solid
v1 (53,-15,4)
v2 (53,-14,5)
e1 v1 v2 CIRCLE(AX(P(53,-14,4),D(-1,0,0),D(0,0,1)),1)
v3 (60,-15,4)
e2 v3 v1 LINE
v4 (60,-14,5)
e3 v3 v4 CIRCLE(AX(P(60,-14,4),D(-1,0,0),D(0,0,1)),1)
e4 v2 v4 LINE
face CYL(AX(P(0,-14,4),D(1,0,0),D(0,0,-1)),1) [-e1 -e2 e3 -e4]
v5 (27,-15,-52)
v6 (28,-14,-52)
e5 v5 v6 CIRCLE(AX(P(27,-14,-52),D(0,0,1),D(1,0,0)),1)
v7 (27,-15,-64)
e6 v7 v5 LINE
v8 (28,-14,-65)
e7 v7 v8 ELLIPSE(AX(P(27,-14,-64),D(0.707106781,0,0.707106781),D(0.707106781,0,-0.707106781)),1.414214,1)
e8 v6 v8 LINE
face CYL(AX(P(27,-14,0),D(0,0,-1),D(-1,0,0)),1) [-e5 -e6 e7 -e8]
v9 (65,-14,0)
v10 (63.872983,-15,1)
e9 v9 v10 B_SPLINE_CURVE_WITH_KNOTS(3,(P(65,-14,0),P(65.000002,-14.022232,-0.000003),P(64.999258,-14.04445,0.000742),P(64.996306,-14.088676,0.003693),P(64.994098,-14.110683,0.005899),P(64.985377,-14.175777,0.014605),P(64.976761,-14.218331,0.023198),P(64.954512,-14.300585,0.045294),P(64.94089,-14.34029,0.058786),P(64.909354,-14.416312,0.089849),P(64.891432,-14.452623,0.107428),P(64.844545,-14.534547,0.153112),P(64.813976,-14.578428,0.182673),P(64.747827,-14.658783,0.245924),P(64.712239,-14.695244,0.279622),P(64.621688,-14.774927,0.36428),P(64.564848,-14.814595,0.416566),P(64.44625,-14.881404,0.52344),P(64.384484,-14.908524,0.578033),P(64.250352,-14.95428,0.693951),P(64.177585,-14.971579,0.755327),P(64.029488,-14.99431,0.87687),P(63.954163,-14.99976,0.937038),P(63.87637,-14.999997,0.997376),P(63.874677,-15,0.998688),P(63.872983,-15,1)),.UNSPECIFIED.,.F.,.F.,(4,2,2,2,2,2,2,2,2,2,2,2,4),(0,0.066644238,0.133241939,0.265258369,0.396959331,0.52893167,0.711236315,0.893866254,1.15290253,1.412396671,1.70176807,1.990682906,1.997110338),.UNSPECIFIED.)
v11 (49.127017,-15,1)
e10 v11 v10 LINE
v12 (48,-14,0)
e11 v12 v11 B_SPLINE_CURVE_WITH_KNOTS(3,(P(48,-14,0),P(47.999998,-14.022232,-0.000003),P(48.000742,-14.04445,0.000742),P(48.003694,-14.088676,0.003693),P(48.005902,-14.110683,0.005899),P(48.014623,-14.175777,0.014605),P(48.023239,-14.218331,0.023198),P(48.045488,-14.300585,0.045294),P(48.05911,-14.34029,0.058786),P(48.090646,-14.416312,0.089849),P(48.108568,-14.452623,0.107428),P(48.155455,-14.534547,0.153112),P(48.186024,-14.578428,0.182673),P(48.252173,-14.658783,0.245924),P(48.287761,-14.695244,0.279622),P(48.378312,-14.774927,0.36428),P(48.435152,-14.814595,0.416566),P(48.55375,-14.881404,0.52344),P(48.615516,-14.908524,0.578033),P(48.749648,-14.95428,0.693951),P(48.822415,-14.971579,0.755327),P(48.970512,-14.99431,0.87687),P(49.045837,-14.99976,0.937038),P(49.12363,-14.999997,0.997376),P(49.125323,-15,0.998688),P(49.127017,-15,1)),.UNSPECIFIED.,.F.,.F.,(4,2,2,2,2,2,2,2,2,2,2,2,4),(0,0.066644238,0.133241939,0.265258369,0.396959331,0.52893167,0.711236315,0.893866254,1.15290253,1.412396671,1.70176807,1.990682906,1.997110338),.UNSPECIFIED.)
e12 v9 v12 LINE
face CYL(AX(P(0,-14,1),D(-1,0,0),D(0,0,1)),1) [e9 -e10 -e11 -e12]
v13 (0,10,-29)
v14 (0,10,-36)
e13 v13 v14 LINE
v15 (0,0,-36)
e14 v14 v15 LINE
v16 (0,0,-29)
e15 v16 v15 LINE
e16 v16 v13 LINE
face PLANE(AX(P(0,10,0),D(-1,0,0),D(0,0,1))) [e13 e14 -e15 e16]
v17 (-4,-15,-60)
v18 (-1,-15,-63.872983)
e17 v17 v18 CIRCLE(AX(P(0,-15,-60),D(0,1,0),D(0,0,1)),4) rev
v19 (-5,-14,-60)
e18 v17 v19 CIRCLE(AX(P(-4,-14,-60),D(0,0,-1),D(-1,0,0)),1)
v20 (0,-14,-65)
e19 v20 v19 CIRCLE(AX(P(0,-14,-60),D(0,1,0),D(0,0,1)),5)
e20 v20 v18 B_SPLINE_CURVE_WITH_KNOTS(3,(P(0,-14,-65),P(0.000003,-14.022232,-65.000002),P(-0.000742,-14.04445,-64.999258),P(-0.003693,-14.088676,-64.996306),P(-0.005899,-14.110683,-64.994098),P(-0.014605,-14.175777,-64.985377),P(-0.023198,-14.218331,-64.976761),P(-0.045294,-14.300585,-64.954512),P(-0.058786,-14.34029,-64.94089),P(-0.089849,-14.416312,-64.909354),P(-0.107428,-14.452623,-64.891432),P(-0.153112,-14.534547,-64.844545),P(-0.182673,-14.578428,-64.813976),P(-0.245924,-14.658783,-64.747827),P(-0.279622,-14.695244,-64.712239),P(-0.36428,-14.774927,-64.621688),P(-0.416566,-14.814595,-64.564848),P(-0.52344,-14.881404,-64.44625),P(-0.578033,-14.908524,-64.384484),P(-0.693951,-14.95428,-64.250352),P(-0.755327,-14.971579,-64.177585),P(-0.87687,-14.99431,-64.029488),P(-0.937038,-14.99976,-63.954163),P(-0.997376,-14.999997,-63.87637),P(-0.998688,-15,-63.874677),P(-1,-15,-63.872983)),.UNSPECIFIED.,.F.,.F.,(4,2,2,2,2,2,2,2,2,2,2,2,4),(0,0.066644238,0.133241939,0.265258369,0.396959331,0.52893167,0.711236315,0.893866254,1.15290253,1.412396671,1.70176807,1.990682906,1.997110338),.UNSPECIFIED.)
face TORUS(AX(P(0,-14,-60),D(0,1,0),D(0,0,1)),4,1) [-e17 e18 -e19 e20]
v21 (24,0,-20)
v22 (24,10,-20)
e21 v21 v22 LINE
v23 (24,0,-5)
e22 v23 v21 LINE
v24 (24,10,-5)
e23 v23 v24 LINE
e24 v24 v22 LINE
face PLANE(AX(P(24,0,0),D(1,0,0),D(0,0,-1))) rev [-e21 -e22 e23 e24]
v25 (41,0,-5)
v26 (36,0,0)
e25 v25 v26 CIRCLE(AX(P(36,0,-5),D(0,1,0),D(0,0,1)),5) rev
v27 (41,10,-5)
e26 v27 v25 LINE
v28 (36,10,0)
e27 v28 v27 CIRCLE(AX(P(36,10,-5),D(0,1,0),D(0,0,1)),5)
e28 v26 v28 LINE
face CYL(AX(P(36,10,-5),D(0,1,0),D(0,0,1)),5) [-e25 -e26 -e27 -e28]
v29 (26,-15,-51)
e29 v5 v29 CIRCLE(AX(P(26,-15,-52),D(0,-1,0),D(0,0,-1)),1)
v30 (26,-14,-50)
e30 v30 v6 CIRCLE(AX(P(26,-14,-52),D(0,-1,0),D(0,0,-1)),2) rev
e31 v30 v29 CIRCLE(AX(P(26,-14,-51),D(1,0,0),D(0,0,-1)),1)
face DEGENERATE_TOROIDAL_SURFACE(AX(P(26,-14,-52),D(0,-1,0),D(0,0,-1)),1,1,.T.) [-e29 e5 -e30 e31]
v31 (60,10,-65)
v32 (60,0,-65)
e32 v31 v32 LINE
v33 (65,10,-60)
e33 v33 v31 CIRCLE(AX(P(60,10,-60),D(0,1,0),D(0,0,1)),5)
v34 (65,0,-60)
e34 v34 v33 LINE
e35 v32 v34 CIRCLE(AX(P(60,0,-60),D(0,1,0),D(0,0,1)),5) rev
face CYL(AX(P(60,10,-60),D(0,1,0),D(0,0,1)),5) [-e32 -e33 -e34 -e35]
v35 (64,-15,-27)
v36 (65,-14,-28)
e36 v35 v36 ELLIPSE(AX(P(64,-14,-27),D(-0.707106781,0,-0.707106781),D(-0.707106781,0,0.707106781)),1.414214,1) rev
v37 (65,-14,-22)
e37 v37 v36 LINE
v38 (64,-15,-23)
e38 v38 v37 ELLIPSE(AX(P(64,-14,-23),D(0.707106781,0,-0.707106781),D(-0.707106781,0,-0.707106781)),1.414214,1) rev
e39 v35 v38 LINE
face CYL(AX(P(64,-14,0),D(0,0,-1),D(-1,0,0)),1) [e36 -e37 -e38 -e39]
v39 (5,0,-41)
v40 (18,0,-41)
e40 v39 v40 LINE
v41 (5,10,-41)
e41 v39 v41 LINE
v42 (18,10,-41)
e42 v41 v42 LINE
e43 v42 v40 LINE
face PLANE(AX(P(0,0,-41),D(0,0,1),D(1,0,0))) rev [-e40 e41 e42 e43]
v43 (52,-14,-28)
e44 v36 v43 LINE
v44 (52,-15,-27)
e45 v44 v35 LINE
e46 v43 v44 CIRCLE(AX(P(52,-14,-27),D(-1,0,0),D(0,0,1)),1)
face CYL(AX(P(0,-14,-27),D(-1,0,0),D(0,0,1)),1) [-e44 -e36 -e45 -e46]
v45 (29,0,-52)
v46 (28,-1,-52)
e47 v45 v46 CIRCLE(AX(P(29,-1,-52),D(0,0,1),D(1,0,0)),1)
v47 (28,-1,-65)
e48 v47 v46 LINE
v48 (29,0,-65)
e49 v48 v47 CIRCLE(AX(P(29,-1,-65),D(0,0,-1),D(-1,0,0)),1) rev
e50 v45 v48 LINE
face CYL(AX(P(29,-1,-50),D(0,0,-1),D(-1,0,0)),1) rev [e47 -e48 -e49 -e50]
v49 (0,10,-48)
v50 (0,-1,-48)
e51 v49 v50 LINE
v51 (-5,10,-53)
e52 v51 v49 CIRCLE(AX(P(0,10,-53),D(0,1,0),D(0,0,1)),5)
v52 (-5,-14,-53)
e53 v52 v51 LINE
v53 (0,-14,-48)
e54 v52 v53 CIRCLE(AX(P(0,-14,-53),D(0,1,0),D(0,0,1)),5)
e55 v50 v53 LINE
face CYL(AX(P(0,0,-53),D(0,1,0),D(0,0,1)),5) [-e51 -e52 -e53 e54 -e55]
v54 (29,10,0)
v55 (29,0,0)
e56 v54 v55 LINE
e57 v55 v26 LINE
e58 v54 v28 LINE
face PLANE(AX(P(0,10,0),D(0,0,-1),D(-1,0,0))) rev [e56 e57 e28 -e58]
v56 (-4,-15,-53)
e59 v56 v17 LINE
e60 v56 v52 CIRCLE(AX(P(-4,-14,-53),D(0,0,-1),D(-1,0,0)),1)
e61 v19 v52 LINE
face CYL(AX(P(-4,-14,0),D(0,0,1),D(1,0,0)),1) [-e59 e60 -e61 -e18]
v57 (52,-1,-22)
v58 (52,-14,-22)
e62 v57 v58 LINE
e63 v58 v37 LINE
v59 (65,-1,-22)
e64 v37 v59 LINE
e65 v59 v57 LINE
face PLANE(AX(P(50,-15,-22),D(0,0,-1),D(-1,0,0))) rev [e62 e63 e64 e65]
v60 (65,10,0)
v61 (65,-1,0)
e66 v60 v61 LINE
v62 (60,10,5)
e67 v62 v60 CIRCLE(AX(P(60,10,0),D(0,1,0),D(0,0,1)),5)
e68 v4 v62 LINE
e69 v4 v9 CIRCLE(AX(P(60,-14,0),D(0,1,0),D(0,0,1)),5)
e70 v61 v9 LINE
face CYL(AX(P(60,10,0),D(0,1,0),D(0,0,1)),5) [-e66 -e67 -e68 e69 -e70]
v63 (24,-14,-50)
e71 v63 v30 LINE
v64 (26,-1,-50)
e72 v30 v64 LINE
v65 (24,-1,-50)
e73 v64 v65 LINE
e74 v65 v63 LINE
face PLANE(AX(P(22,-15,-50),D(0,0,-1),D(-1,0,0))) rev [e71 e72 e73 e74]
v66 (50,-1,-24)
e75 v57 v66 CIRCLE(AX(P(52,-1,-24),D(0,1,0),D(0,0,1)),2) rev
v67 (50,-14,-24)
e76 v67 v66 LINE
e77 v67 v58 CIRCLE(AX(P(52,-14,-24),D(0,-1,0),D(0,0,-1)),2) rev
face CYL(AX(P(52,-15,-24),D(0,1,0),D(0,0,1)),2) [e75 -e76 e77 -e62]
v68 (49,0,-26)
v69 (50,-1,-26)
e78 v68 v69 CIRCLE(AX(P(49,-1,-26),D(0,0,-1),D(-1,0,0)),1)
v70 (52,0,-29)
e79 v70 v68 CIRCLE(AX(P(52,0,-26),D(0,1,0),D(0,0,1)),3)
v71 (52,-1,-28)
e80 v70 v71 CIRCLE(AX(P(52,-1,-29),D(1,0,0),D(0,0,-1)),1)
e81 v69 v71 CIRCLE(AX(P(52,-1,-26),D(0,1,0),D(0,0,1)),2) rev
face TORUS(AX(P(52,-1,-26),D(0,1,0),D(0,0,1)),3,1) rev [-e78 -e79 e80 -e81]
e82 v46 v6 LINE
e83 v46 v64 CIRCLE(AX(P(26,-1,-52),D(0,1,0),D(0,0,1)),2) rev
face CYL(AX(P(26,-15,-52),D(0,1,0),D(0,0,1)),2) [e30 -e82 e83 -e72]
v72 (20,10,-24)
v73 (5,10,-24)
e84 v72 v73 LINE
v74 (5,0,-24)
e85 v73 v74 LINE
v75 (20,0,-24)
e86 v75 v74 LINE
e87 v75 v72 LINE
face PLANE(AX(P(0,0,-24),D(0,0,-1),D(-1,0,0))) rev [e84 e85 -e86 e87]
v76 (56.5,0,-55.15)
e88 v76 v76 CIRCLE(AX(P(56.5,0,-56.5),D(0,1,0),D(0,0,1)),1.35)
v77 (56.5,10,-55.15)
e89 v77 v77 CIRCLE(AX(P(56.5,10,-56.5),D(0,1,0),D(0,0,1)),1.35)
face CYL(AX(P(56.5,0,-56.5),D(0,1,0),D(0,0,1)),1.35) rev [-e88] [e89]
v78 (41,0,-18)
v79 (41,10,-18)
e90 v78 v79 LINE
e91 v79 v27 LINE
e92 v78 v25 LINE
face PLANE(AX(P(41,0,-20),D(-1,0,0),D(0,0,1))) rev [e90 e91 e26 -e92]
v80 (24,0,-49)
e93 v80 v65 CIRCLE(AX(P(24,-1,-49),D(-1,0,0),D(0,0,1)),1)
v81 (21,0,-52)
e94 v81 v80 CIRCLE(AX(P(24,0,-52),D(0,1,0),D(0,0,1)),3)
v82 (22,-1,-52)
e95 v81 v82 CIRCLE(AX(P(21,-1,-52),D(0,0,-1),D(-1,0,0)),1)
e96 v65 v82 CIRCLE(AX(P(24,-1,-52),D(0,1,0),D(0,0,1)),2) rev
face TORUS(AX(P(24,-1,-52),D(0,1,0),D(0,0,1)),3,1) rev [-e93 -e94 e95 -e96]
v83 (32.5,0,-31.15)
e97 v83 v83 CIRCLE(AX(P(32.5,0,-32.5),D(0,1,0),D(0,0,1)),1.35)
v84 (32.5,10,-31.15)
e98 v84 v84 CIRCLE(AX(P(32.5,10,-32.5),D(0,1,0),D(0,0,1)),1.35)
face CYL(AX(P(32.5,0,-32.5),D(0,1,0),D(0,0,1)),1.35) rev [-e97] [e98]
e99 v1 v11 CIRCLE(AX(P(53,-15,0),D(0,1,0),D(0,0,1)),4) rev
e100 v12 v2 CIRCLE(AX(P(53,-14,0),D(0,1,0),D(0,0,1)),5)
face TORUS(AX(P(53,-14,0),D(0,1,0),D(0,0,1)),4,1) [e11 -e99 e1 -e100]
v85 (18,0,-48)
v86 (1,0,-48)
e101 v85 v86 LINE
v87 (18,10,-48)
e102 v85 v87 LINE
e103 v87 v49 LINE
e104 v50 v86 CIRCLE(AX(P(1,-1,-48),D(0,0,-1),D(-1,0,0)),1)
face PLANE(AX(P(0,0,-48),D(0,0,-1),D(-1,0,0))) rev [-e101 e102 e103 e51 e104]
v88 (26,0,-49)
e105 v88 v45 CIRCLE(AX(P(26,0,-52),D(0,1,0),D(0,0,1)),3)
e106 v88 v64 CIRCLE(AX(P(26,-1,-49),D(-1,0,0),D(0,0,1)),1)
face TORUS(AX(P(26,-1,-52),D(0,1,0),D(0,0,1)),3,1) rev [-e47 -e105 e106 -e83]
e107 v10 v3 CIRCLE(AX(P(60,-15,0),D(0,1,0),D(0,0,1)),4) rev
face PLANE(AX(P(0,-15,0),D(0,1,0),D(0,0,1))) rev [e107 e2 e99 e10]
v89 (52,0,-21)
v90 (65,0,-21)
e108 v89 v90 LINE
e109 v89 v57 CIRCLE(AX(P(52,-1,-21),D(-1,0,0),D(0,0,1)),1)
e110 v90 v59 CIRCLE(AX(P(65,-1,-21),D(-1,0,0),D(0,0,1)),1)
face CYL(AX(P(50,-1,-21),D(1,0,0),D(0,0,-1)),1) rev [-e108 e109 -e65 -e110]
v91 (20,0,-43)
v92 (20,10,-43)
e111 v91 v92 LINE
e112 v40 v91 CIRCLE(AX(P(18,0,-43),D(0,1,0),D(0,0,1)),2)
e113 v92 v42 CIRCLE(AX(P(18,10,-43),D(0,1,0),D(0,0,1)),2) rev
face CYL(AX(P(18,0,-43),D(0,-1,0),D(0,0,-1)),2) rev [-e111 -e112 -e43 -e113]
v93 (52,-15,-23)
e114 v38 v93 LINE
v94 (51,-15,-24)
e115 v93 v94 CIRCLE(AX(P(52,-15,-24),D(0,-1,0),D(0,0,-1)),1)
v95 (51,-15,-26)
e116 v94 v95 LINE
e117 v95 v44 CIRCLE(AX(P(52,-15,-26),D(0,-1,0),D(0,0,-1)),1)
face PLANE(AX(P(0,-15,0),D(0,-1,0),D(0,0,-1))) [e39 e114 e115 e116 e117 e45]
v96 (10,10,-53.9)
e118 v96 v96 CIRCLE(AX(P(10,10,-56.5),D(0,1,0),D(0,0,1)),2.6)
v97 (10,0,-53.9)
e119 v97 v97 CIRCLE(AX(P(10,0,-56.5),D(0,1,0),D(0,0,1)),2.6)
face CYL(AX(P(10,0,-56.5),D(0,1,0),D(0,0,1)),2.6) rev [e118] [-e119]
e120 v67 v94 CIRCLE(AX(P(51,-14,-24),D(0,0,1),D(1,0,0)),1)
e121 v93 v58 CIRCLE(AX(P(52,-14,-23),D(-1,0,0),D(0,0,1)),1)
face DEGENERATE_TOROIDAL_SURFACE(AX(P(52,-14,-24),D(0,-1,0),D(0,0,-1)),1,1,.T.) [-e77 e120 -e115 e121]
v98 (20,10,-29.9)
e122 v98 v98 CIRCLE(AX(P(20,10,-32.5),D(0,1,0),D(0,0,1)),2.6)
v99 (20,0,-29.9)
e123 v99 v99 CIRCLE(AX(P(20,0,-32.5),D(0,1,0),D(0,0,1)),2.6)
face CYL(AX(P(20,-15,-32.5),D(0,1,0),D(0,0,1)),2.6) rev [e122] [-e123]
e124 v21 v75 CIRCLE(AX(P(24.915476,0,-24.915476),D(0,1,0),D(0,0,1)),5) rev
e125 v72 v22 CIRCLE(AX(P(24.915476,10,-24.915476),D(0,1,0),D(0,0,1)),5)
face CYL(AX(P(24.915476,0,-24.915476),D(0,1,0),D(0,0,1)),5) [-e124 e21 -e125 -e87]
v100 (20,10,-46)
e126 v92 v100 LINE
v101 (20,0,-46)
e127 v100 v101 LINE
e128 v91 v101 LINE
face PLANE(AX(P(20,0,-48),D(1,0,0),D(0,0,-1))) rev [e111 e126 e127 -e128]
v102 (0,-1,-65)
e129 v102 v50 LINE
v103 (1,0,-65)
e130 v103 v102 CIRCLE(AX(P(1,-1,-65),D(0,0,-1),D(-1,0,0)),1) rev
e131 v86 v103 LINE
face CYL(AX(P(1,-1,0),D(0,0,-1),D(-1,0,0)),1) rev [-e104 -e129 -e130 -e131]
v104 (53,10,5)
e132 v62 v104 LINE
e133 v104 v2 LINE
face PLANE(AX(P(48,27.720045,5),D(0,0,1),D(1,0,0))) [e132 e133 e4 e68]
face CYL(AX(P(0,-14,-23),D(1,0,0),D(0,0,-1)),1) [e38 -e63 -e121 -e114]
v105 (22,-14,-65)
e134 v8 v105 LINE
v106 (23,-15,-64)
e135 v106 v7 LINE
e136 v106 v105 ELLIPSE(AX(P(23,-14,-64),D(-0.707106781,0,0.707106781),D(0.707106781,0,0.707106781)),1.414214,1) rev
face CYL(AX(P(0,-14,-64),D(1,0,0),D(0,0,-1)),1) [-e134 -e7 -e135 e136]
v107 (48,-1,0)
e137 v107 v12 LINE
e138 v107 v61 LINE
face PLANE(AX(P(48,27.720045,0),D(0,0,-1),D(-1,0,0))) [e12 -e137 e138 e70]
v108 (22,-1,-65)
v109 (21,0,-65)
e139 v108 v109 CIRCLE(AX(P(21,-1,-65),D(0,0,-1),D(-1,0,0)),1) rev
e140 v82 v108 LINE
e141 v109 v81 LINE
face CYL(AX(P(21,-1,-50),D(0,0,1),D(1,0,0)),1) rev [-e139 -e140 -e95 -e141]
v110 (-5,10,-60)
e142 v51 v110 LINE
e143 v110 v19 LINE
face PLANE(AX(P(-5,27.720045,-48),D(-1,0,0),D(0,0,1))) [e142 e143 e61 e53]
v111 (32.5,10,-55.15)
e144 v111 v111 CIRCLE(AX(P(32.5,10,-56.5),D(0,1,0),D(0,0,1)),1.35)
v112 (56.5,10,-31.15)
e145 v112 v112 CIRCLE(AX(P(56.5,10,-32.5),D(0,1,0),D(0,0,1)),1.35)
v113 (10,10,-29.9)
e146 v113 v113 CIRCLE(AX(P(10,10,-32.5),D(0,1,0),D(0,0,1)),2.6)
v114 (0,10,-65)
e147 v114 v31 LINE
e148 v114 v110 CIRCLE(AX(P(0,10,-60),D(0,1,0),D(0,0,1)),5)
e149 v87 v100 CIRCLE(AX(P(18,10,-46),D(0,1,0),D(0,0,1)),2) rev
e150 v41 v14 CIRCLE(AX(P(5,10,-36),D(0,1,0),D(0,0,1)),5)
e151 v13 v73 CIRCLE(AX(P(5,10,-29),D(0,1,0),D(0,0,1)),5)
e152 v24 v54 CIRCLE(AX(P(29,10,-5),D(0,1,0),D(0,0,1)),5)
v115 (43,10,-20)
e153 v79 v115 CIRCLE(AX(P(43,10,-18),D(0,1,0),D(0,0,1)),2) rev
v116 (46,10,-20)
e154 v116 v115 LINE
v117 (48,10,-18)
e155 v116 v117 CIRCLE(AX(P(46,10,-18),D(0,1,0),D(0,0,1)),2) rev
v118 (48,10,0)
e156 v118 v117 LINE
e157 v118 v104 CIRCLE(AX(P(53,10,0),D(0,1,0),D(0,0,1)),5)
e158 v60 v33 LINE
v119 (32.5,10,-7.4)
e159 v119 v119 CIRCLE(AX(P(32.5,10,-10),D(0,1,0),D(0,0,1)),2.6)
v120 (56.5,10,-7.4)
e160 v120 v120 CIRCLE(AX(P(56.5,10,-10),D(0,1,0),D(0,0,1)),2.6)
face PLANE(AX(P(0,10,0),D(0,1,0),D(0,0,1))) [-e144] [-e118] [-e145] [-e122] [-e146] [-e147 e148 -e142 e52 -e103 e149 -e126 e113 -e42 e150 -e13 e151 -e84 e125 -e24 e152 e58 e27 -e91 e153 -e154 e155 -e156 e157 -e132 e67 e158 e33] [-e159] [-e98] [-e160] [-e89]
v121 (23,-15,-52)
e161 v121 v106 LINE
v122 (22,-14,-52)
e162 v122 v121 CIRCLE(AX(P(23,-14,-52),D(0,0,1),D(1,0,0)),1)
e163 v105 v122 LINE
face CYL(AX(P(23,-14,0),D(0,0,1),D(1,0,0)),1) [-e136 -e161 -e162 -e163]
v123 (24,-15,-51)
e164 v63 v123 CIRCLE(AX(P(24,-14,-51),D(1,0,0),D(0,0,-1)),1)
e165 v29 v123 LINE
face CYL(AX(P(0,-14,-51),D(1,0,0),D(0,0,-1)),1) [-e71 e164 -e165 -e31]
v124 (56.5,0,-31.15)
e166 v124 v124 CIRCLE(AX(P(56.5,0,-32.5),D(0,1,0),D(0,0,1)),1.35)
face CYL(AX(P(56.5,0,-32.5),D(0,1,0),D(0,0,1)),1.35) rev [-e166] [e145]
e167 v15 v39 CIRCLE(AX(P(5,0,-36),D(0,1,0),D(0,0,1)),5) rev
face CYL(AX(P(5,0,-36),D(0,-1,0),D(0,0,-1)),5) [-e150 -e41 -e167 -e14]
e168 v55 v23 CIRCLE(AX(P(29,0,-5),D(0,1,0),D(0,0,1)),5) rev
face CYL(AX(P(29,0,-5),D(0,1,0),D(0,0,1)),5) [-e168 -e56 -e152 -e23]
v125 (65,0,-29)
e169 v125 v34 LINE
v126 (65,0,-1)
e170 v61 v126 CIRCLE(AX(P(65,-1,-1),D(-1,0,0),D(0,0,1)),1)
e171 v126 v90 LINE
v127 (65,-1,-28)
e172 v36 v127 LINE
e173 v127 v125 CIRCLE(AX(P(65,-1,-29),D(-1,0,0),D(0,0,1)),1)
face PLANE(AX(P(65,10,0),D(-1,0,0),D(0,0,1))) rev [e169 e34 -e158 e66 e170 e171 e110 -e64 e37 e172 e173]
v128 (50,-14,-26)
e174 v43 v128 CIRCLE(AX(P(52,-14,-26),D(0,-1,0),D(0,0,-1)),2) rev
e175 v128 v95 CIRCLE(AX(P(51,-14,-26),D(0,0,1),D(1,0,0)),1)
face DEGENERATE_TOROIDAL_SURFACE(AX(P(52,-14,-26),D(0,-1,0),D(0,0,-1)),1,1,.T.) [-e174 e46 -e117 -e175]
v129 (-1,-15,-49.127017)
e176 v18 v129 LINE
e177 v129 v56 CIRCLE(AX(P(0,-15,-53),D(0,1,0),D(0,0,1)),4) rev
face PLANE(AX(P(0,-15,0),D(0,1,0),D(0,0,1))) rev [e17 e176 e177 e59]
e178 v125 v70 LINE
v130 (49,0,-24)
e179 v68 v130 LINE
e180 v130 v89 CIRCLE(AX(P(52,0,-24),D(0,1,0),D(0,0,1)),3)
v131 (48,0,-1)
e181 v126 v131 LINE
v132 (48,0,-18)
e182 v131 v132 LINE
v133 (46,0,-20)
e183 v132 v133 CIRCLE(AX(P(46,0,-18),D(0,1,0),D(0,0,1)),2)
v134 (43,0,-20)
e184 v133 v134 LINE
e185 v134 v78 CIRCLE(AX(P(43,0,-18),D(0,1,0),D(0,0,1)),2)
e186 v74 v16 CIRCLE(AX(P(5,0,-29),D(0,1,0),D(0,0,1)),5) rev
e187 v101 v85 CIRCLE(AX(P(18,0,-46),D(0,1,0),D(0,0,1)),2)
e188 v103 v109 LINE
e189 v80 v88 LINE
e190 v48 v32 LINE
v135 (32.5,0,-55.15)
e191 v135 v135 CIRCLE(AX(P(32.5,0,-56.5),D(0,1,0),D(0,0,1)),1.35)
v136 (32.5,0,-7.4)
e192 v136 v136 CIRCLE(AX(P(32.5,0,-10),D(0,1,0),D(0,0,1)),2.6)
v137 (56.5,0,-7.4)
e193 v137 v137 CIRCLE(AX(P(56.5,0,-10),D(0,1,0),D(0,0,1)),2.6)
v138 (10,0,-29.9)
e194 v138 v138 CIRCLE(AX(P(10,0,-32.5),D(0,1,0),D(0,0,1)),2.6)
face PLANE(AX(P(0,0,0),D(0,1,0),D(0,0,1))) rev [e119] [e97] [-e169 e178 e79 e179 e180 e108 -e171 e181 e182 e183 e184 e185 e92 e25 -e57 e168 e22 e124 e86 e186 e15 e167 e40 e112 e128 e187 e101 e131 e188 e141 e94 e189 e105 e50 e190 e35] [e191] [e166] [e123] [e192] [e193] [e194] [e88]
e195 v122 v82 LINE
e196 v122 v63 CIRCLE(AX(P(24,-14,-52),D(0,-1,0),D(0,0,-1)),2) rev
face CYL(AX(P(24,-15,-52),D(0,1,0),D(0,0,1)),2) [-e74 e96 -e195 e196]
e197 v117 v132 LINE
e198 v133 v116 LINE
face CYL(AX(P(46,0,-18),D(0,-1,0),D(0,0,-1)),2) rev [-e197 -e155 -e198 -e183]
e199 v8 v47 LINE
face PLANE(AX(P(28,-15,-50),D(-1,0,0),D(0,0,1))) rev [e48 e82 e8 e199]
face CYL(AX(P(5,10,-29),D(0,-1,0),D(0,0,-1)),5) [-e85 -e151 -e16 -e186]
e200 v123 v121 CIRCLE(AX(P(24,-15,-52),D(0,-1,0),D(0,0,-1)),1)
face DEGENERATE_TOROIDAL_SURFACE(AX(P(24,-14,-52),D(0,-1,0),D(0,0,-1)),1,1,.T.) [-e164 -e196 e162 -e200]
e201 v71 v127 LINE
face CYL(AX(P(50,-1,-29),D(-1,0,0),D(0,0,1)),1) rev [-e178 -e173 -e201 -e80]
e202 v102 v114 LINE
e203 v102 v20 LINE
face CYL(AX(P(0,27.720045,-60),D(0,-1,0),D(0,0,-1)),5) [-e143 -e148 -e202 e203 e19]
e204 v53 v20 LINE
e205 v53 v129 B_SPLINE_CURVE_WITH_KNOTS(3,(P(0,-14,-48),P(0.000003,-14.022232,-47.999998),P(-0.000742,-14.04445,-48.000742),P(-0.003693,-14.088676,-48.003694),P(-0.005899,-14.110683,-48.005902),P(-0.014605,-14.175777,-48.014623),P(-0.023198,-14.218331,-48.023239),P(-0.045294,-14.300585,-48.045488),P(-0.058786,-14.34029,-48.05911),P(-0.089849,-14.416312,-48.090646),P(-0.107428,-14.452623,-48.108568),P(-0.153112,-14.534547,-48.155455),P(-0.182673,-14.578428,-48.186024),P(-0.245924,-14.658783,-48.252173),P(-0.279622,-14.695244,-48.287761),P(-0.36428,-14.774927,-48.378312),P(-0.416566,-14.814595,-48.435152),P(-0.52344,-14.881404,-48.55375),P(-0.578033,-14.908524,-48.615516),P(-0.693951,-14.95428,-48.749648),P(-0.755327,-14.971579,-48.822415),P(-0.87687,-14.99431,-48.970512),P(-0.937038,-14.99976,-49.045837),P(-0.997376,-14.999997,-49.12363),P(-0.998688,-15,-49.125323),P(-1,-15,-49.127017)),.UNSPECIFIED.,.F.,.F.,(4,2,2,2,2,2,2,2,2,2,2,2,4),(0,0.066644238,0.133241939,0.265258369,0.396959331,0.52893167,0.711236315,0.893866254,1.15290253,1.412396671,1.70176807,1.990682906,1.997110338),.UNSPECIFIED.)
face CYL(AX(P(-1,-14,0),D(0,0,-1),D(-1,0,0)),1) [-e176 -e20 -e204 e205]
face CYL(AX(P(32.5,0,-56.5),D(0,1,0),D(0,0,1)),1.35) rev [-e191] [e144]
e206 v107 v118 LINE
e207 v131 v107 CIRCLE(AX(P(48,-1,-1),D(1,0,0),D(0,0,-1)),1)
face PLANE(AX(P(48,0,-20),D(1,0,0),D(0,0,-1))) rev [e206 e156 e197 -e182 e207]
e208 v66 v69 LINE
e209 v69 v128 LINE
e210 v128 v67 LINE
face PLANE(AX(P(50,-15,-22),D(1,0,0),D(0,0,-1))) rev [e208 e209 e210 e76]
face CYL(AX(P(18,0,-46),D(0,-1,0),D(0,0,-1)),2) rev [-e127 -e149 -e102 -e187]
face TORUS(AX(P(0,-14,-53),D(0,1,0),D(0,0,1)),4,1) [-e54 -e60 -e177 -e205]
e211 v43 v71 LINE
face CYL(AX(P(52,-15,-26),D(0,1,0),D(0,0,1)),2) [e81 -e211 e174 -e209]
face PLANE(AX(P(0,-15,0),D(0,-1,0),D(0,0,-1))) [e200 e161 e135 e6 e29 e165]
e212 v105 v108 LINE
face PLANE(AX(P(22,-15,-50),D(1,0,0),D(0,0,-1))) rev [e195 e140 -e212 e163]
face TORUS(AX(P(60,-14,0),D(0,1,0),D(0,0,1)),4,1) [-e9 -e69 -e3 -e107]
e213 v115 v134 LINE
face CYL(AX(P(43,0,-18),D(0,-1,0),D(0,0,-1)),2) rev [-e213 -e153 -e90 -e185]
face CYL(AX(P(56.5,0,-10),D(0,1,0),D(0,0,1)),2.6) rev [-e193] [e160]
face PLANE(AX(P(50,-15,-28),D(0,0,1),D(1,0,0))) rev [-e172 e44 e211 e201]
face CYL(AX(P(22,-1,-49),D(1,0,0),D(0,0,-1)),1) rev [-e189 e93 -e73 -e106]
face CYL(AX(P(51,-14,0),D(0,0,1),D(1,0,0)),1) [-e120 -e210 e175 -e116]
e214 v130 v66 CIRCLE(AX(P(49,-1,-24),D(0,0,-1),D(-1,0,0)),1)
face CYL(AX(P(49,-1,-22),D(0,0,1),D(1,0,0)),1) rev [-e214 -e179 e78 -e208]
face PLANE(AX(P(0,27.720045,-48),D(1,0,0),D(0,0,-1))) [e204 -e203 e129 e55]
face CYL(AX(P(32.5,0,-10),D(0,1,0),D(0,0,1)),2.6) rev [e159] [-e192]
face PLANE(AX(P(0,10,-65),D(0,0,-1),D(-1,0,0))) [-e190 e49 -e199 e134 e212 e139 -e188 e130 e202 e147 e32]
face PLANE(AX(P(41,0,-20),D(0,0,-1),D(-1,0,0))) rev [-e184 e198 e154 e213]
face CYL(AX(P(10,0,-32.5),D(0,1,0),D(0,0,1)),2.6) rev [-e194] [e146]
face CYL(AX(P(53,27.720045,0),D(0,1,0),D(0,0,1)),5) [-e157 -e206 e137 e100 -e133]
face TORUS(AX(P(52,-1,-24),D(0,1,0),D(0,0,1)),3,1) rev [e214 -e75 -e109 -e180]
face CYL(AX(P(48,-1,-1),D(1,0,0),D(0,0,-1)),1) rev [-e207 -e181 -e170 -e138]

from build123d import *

# Parameters (mm, degrees)
SKETCH1_W                = 65
SKETCH1_H                = 65
BOSS_EXTRUDE2_DEPTH      = 10
SKETCH6_R                = 1.35
CUT_EXTRUDE3_DEPTH       = 93.466210045
SKETCH7_R                = 2.6
SKETCH7_W                = 20
SKETCH7_H                = 7
SKETCH7_W_2              = 7
SKETCH7_H_2              = 20
CUT_EXTRUDE4_DEPTH       = 93.466210045
SKETCH9_W                = 15
SKETCH9_H                = 6
SKETCH9_W_2              = 6
SKETCH9_H_2              = 15
BOSS_EXTRUDE5_DEPTH      = 15
FILLET4_R                = 2
FILLET5_R                = 1
FILLET6_R                = 1
BOSS_EXTRUDE6_DEPTH      = 15
BOSS_EXTRUDE6_DEPTH_BACK = 10
SKETCH10_W               = 17
SKETCH10_H               = 5
SKETCH10_W_2             = 5
SKETCH10_H_2             = 17
FILLET7_R                = 5
FILLET8_R                = 1
SKETCH11_R               = 2.6
CUT_EXTRUDE5_DEPTH       = 96.262794579


with BuildPart() as part:
    # Sketch1 → Boss-Extrude2 (new body)
    with BuildSketch(Plane(origin=(0, 0, 0), x_dir=(1, 0, 0), z_dir=(0, 1, 0))):
        with Locations((32.5, 32.5)):
            Rectangle(SKETCH1_W, SKETCH1_H)
    extrude(amount=BOSS_EXTRUDE2_DEPTH)

    # Sketch6 → Cut-Extrude3 (cut, through all)
    with BuildSketch(Plane(origin=(0, 10, 0), x_dir=(1, 0, 0), z_dir=(0, 1, 0))):
        with Locations(Location((56.5, 56.5, 0), (0, 0, 270))):
            Circle(SKETCH6_R)
        with Locations(Location((32.5, 56.5, 0), (0, 0, 270))):
            Circle(SKETCH6_R)
        with Locations(Location((32.5, 32.5, 0), (0, 0, 270))):
            Circle(SKETCH6_R)
        with Locations(Location((56.5, 32.5, 0), (0, 0, 270))):
            Circle(SKETCH6_R)
    extrude(amount=-CUT_EXTRUDE3_DEPTH, mode=Mode.SUBTRACT)

    # Sketch7 → Cut-Extrude4 (cut, through all)
    with BuildSketch(Plane(origin=(0, 10, 0), x_dir=(1, 0, 0), z_dir=(0, 1, 0))):
        with Locations(Location((10, 32.5, 0), (0, 0, 270))):
            Circle(SKETCH7_R)
        with Locations(Location((10, 56.5, 0), (0, 0, 270))):
            Circle(SKETCH7_R)
        with Locations(Location((32.5, 10, 0), (0, 0, 270))):
            Circle(SKETCH7_R)
        with Locations(Location((56.5, 10, 0), (0, 0, 270))):
            Circle(SKETCH7_R)
        with Locations((10, 44.5)):
            Rectangle(SKETCH7_W, SKETCH7_H)
        with Locations((44.5, 10)):
            Rectangle(SKETCH7_W_2, SKETCH7_H_2)
        Polygon((0, 24), (20, 24), (20, 20), (24, 20), (24, 0), (20, 0), (0, 0), (0, 20), align=None)
    extrude(amount=-CUT_EXTRUDE4_DEPTH, mode=Mode.SUBTRACT)

    # Sketch9 → Boss-Extrude5 (add)
    with BuildSketch(Plane.XZ):
        with Locations((57.5, -25)):
            Rectangle(SKETCH9_W, SKETCH9_H)
        with Locations((25, -57.5)):
            Rectangle(SKETCH9_W_2, SKETCH9_H_2)
    extrude(amount=BOSS_EXTRUDE5_DEPTH)

    # Fillet4
    fillet4_edges = [part.edges().sort_by_distance(p)[0] for p in [
        (50, -7.5, -22),
        (50, -7.5, -28),
        (22, -7.5, -50),
        (28, -7.5, -50),
        (41, 5, -20),
        (48, 5, -20),
        (20, 5, -48),
        (20, 5, -41),
    ]]
    fillet(fillet4_edges, radius=FILLET4_R)

    # Fillet5
    fillet5_edges = [part.edges().sort_by_distance(p)[0] for p in [
        (58.5, 0, -22),
        (28, 0, -58.5),
        (22, 0, -58.5),
        (25, 0, -50),
        (58.5, 0, -28),
        (50, 0, -25),
        (22.585786438, 0, -50.585786438),
        (27.414213562, 0, -50.585786438),
        (50.585786438, 0, -27.414213562),
        (50.585786438, 0, -22.585786438),
    ]]
    fillet(fillet5_edges, radius=FILLET5_R)

    # Fillet6
    fillet6_edges = [part.edges().sort_by_distance(p)[0] for p in [
        (65, -15, -25),
        (58.5, -15, -22),
        (25, -15, -65),
        (28, -15, -58.5),
        (22, -15, -58.5),
        (25, -15, -50),
        (27.414213562, -15, -50.585786438),
        (22.585786438, -15, -50.585786438),
        (58.5, -15, -28),
        (50, -15, -25),
        (50.585786438, -15, -22.585786438),
        (50.585786438, -15, -27.414213562),
    ]]
    fillet(fillet6_edges, radius=FILLET6_R)

    # Sketch10 → Boss-Extrude6 (add, two sides: drawn at the far end of the back side and taken through both)
    with BuildSketch(Plane.XZ.offset(-BOSS_EXTRUDE6_DEPTH_BACK)):
        with Locations((56.5, 2.5)):
            Rectangle(SKETCH10_W, SKETCH10_H)
        with Locations((-2.5, -56.5)):
            Rectangle(SKETCH10_W_2, SKETCH10_H_2)
    extrude(amount=BOSS_EXTRUDE6_DEPTH + BOSS_EXTRUDE6_DEPTH_BACK)

    # Fillet7
    # the kernel refuses this fillet: 5 mm, written as the material it takes off along each edge
    with BuildSketch(Plane(origin=(65, -12.5, -65), x_dir=(-1, 0, 0), z_dir=(0, 1, 0)), Plane(origin=(41, 22.5, 0), x_dir=(-1, 0, 0), z_dir=(0, -1, 0)), Plane(origin=(24, 22.5, 0), x_dir=(0, 0, -1), z_dir=(0, -1, 0)), Plane(origin=(0, 22.5, -24), x_dir=(0, 0, -1), z_dir=(0, -1, 0)), Plane(origin=(0, 22.5, -41), x_dir=(1, 0, 0), z_dir=(0, -1, 0))) as fillet7_piece_1:
        with BuildLine():
            CenterArc((FILLET7_R, FILLET7_R), FILLET7_R, 180, 90)
            Line((0, FILLET7_R), (0, 0))
            Line((0, 0), (FILLET7_R, 0))
        make_face()
    extrude(amount=35, mode=Mode.SUBTRACT)
    with BuildSketch(Plane(origin=(65, 22.5, 5), x_dir=(-1, 0, 0), z_dir=(0, -1, 0)), Plane(origin=(-5, 22.5, -65), x_dir=(1, 0, 0), z_dir=(0, -1, 0))) as fillet7_piece_2:
        with BuildLine():
            CenterArc((FILLET7_R, FILLET7_R), FILLET7_R, 180, 90)
            Line((0, FILLET7_R), (0, 0))
            Line((0, 0), (FILLET7_R, 0))
        make_face()
    extrude(amount=50, mode=Mode.SUBTRACT)
    with BuildSketch(Plane(origin=(48, -27.5, 5), x_dir=(0, 0, -1), z_dir=(0, 1, 0)), Plane(origin=(-5, 22.5, -48), x_dir=(1, 0, 0), z_dir=(0, -1, 0))) as fillet7_piece_3:
        with BuildLine():
            CenterArc((FILLET7_R, -FILLET7_R), FILLET7_R, 90, 90)
            Line((0, -FILLET7_R), (0, 0))
            Line((0, 0), (FILLET7_R, 0))
        make_face()
    extrude(amount=50, mode=Mode.SUBTRACT)
    with BuildSketch(Plane(origin=(20, 20, -20), x_dir=(0, 0, -1), z_dir=(0, -1, 0))) as fillet7_piece_4:
        with BuildLine():
            CenterArc((4.915475947, 4.915475947), FILLET7_R, 190.550098012, 68.899803976)
            Line((0, 4), (0, 0))
            Line((0, 0), (4, 0))
        make_face()
    extrude(amount=30, mode=Mode.SUBTRACT)

    # Fillet8
    fillet8_edges = [part.edges().sort_by_distance(p)[0] for p in [
        (56.5, -15, 0),
        (0, -15, -56.5),
        (56.5, -15, 5),
        (49.464466094, -15, 3.535533906),
        (63.535533906, -15, 3.535533906),
        (-5, -15, -56.5),
        (-3.535533906, -15, -63.535533906),
        (-3.535533906, -15, -49.464466094),
        (56.5, 0, 0),
        (0, 0, -56.5),
    ]]
    fillet(fillet8_edges, radius=FILLET8_R)

    # Sketch11 → Cut-Extrude5 (cut, through all)
    with BuildSketch(Plane(origin=(0, 10, 0), x_dir=(1, 0, 0), z_dir=(0, 1, 0))):
        with Locations(Location((20, 32.5, 0), (0, 0, 270))):
            Circle(SKETCH11_R)
    extrude(amount=-CUT_EXTRUDE5_DEPTH, mode=Mode.SUBTRACT)


solid = part.part
